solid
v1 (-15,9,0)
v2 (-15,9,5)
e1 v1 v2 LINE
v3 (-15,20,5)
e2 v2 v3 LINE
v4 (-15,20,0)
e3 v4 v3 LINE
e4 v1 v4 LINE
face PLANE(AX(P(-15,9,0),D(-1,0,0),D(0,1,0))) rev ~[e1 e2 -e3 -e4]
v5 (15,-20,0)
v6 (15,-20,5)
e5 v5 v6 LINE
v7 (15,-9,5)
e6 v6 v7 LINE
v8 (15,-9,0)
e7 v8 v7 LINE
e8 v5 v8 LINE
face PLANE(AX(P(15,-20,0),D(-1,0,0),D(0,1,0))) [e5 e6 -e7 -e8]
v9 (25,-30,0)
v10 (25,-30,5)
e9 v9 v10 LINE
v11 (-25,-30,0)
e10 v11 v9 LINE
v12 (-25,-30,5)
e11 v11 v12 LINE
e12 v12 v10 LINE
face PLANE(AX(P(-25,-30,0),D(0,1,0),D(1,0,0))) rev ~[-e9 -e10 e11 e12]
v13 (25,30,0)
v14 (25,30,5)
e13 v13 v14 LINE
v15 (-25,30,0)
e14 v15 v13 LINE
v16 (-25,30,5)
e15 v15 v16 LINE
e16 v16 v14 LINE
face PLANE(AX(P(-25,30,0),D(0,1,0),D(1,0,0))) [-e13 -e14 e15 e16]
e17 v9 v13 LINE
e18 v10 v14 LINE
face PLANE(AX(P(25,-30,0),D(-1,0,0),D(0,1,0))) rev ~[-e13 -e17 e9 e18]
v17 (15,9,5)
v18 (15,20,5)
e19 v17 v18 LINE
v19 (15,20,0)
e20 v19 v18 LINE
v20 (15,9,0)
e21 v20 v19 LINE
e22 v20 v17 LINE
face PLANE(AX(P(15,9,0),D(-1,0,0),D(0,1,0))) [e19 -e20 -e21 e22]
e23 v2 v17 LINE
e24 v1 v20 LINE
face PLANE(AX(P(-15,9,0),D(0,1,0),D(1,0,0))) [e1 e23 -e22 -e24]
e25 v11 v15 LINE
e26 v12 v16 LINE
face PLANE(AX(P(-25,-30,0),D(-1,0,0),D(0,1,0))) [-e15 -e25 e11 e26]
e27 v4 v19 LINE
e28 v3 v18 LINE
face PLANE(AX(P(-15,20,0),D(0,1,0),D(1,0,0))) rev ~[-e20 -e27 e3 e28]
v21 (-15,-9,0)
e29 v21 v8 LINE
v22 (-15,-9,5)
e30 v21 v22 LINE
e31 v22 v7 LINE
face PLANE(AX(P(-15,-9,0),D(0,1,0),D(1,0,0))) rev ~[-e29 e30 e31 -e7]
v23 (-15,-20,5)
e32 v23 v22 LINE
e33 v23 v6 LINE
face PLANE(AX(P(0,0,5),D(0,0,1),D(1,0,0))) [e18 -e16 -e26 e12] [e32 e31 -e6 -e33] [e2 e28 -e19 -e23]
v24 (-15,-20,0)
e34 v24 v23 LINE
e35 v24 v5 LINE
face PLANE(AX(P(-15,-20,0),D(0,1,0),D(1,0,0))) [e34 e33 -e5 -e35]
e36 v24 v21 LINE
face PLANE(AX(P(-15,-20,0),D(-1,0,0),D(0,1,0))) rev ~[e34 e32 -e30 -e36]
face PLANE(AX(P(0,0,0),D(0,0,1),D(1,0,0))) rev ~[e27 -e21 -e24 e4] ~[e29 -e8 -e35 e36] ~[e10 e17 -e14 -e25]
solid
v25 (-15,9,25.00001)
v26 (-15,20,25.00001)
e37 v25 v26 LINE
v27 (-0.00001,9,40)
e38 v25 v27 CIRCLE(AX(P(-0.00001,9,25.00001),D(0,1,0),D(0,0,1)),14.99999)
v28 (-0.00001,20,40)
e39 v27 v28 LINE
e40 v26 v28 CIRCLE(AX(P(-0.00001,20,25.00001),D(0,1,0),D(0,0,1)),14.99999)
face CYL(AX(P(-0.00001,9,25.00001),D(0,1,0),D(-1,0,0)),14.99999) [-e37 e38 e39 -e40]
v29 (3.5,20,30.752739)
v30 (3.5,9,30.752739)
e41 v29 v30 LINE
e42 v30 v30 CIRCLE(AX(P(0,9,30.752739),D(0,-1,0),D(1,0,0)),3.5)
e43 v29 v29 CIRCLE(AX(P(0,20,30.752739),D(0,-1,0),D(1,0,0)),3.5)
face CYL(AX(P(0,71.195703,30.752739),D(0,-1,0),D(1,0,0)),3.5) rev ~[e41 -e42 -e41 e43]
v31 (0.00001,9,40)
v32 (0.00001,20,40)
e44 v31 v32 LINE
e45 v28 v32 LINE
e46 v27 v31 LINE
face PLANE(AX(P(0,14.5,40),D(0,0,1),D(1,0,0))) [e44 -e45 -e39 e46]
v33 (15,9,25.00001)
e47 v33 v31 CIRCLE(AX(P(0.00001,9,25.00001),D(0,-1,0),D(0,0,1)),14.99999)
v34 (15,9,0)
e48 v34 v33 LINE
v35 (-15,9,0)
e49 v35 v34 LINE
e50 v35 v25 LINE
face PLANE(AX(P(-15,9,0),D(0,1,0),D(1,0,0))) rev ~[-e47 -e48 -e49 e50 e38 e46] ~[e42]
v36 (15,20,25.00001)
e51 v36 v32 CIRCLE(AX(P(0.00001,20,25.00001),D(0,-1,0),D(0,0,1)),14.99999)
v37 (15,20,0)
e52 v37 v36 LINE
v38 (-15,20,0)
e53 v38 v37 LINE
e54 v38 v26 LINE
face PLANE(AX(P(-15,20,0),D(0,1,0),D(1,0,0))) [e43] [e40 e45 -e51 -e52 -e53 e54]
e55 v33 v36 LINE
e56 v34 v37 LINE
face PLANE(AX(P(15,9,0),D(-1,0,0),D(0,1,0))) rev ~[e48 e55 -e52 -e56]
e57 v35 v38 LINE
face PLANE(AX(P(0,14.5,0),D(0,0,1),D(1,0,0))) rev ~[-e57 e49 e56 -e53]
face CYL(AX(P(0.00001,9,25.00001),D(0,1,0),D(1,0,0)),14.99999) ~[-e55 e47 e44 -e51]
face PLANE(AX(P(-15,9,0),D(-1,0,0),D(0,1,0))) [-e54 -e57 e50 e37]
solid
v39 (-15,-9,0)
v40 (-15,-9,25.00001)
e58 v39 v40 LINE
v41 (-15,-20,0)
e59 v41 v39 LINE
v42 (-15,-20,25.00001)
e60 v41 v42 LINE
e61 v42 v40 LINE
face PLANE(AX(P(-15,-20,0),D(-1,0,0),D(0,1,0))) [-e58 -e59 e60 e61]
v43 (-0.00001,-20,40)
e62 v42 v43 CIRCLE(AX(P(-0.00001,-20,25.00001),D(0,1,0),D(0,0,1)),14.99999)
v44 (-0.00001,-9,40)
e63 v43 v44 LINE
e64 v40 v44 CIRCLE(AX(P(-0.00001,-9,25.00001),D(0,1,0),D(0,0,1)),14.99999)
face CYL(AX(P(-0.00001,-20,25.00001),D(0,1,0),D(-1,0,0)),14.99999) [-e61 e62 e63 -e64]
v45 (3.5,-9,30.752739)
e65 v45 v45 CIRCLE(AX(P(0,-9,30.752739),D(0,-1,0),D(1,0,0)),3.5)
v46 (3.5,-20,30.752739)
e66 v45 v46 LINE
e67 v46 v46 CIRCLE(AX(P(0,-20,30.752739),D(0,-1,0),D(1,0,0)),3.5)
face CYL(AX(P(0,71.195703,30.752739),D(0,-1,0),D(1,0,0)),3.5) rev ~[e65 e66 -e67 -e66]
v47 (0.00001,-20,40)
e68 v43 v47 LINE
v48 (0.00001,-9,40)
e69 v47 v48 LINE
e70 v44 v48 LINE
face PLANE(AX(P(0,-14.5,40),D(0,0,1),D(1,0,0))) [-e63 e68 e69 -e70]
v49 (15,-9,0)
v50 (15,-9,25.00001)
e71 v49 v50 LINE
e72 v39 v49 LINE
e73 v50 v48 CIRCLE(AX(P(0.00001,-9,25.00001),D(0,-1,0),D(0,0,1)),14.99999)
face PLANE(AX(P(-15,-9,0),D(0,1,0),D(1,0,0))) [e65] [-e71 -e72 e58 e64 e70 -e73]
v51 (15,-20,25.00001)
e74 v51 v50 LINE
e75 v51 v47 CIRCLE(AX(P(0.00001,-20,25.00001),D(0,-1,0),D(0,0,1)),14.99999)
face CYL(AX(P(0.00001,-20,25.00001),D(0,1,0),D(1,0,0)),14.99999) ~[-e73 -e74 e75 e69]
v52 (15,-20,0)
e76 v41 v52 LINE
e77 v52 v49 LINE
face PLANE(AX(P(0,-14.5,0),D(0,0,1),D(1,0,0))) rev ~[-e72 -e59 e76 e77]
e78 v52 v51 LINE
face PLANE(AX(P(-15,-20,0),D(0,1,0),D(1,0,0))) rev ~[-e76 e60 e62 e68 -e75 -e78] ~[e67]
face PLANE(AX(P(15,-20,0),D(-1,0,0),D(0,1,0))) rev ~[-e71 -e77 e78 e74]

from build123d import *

# Parameters (mm, degrees)
F0_W     = 30
F0_H     = 11
F1_DEPTH = 40
F0_W_2   = 50
F0_H_2   = 60
F2_DEPTH = 5
F3_R     = 14.99999
F3_2_R   = 14.99999
F5_D     = 7
F5_2_D   = 7


# Not quite as in the source:
# - a fillet or chamfer is up to 0.001 mm smaller than in the source, because OpenCascade refuses the exact size


with BuildPart() as f1:
    # F0 (on Top) → F1 (new body)
    with BuildSketch(Plane.XY):
        with Locations((0, 14.5)):
            Rectangle(F0_W, F0_H)
    extrude(amount=F1_DEPTH)

    # F3#2 (radius 15 in the source; OpenCascade refuses exactly that, so slightly less here)
    f3_2_edges = [f1.edges().sort_by_distance(p)[0] for p in [
        (15, 14.5, 40),
        (-15, 14.5, 40),
    ]]
    fillet(f3_2_edges, radius=F3_2_R)

    # F5 (through all)
    with Locations(Plane(origin=(0, 20, 0), x_dir=(-1, 0, 0), z_dir=(0, 1, 0))):
        with Locations((0, 30.7527389377)):
            Hole(F5_D / 2)


with BuildPart() as f1b:
    # F0 (on Top) → F1, piece 2 (new body)
    with BuildSketch(Plane.XY):
        with Locations((0, -14.5)):
            Rectangle(F0_W, F0_H)
    extrude(amount=F1_DEPTH)

    # F3 (radius 15 in the source; OpenCascade refuses exactly that, so slightly less here)
    f3_edges = [f1b.edges().sort_by_distance(p)[0] for p in [
        (15, -14.5, 40),
        (-15, -14.5, 40),
    ]]
    fillet(f3_edges, radius=F3_R)

    # F5#2 (through all)
    with Locations(Plane(origin=(0, 20, 0), x_dir=(-1, 0, 0), z_dir=(0, 1, 0))):
        with Locations((0, 30.7527389377)):
            Hole(F5_2_D / 2)


with BuildPart() as f2:
    # F0 (on Top) → F2 (new body)
    with BuildSketch(Plane.XY):
        Rectangle(F0_W_2, F0_H_2)
        with Locations((0, -14.5)):
            Rectangle(F0_W, F0_H, mode=Mode.SUBTRACT)
        with Locations((0, 14.5)):
            Rectangle(F0_W, F0_H, mode=Mode.SUBTRACT)
    extrude(amount=F2_DEPTH)


solid = Compound([f1.part, f1b.part, f2.part])
